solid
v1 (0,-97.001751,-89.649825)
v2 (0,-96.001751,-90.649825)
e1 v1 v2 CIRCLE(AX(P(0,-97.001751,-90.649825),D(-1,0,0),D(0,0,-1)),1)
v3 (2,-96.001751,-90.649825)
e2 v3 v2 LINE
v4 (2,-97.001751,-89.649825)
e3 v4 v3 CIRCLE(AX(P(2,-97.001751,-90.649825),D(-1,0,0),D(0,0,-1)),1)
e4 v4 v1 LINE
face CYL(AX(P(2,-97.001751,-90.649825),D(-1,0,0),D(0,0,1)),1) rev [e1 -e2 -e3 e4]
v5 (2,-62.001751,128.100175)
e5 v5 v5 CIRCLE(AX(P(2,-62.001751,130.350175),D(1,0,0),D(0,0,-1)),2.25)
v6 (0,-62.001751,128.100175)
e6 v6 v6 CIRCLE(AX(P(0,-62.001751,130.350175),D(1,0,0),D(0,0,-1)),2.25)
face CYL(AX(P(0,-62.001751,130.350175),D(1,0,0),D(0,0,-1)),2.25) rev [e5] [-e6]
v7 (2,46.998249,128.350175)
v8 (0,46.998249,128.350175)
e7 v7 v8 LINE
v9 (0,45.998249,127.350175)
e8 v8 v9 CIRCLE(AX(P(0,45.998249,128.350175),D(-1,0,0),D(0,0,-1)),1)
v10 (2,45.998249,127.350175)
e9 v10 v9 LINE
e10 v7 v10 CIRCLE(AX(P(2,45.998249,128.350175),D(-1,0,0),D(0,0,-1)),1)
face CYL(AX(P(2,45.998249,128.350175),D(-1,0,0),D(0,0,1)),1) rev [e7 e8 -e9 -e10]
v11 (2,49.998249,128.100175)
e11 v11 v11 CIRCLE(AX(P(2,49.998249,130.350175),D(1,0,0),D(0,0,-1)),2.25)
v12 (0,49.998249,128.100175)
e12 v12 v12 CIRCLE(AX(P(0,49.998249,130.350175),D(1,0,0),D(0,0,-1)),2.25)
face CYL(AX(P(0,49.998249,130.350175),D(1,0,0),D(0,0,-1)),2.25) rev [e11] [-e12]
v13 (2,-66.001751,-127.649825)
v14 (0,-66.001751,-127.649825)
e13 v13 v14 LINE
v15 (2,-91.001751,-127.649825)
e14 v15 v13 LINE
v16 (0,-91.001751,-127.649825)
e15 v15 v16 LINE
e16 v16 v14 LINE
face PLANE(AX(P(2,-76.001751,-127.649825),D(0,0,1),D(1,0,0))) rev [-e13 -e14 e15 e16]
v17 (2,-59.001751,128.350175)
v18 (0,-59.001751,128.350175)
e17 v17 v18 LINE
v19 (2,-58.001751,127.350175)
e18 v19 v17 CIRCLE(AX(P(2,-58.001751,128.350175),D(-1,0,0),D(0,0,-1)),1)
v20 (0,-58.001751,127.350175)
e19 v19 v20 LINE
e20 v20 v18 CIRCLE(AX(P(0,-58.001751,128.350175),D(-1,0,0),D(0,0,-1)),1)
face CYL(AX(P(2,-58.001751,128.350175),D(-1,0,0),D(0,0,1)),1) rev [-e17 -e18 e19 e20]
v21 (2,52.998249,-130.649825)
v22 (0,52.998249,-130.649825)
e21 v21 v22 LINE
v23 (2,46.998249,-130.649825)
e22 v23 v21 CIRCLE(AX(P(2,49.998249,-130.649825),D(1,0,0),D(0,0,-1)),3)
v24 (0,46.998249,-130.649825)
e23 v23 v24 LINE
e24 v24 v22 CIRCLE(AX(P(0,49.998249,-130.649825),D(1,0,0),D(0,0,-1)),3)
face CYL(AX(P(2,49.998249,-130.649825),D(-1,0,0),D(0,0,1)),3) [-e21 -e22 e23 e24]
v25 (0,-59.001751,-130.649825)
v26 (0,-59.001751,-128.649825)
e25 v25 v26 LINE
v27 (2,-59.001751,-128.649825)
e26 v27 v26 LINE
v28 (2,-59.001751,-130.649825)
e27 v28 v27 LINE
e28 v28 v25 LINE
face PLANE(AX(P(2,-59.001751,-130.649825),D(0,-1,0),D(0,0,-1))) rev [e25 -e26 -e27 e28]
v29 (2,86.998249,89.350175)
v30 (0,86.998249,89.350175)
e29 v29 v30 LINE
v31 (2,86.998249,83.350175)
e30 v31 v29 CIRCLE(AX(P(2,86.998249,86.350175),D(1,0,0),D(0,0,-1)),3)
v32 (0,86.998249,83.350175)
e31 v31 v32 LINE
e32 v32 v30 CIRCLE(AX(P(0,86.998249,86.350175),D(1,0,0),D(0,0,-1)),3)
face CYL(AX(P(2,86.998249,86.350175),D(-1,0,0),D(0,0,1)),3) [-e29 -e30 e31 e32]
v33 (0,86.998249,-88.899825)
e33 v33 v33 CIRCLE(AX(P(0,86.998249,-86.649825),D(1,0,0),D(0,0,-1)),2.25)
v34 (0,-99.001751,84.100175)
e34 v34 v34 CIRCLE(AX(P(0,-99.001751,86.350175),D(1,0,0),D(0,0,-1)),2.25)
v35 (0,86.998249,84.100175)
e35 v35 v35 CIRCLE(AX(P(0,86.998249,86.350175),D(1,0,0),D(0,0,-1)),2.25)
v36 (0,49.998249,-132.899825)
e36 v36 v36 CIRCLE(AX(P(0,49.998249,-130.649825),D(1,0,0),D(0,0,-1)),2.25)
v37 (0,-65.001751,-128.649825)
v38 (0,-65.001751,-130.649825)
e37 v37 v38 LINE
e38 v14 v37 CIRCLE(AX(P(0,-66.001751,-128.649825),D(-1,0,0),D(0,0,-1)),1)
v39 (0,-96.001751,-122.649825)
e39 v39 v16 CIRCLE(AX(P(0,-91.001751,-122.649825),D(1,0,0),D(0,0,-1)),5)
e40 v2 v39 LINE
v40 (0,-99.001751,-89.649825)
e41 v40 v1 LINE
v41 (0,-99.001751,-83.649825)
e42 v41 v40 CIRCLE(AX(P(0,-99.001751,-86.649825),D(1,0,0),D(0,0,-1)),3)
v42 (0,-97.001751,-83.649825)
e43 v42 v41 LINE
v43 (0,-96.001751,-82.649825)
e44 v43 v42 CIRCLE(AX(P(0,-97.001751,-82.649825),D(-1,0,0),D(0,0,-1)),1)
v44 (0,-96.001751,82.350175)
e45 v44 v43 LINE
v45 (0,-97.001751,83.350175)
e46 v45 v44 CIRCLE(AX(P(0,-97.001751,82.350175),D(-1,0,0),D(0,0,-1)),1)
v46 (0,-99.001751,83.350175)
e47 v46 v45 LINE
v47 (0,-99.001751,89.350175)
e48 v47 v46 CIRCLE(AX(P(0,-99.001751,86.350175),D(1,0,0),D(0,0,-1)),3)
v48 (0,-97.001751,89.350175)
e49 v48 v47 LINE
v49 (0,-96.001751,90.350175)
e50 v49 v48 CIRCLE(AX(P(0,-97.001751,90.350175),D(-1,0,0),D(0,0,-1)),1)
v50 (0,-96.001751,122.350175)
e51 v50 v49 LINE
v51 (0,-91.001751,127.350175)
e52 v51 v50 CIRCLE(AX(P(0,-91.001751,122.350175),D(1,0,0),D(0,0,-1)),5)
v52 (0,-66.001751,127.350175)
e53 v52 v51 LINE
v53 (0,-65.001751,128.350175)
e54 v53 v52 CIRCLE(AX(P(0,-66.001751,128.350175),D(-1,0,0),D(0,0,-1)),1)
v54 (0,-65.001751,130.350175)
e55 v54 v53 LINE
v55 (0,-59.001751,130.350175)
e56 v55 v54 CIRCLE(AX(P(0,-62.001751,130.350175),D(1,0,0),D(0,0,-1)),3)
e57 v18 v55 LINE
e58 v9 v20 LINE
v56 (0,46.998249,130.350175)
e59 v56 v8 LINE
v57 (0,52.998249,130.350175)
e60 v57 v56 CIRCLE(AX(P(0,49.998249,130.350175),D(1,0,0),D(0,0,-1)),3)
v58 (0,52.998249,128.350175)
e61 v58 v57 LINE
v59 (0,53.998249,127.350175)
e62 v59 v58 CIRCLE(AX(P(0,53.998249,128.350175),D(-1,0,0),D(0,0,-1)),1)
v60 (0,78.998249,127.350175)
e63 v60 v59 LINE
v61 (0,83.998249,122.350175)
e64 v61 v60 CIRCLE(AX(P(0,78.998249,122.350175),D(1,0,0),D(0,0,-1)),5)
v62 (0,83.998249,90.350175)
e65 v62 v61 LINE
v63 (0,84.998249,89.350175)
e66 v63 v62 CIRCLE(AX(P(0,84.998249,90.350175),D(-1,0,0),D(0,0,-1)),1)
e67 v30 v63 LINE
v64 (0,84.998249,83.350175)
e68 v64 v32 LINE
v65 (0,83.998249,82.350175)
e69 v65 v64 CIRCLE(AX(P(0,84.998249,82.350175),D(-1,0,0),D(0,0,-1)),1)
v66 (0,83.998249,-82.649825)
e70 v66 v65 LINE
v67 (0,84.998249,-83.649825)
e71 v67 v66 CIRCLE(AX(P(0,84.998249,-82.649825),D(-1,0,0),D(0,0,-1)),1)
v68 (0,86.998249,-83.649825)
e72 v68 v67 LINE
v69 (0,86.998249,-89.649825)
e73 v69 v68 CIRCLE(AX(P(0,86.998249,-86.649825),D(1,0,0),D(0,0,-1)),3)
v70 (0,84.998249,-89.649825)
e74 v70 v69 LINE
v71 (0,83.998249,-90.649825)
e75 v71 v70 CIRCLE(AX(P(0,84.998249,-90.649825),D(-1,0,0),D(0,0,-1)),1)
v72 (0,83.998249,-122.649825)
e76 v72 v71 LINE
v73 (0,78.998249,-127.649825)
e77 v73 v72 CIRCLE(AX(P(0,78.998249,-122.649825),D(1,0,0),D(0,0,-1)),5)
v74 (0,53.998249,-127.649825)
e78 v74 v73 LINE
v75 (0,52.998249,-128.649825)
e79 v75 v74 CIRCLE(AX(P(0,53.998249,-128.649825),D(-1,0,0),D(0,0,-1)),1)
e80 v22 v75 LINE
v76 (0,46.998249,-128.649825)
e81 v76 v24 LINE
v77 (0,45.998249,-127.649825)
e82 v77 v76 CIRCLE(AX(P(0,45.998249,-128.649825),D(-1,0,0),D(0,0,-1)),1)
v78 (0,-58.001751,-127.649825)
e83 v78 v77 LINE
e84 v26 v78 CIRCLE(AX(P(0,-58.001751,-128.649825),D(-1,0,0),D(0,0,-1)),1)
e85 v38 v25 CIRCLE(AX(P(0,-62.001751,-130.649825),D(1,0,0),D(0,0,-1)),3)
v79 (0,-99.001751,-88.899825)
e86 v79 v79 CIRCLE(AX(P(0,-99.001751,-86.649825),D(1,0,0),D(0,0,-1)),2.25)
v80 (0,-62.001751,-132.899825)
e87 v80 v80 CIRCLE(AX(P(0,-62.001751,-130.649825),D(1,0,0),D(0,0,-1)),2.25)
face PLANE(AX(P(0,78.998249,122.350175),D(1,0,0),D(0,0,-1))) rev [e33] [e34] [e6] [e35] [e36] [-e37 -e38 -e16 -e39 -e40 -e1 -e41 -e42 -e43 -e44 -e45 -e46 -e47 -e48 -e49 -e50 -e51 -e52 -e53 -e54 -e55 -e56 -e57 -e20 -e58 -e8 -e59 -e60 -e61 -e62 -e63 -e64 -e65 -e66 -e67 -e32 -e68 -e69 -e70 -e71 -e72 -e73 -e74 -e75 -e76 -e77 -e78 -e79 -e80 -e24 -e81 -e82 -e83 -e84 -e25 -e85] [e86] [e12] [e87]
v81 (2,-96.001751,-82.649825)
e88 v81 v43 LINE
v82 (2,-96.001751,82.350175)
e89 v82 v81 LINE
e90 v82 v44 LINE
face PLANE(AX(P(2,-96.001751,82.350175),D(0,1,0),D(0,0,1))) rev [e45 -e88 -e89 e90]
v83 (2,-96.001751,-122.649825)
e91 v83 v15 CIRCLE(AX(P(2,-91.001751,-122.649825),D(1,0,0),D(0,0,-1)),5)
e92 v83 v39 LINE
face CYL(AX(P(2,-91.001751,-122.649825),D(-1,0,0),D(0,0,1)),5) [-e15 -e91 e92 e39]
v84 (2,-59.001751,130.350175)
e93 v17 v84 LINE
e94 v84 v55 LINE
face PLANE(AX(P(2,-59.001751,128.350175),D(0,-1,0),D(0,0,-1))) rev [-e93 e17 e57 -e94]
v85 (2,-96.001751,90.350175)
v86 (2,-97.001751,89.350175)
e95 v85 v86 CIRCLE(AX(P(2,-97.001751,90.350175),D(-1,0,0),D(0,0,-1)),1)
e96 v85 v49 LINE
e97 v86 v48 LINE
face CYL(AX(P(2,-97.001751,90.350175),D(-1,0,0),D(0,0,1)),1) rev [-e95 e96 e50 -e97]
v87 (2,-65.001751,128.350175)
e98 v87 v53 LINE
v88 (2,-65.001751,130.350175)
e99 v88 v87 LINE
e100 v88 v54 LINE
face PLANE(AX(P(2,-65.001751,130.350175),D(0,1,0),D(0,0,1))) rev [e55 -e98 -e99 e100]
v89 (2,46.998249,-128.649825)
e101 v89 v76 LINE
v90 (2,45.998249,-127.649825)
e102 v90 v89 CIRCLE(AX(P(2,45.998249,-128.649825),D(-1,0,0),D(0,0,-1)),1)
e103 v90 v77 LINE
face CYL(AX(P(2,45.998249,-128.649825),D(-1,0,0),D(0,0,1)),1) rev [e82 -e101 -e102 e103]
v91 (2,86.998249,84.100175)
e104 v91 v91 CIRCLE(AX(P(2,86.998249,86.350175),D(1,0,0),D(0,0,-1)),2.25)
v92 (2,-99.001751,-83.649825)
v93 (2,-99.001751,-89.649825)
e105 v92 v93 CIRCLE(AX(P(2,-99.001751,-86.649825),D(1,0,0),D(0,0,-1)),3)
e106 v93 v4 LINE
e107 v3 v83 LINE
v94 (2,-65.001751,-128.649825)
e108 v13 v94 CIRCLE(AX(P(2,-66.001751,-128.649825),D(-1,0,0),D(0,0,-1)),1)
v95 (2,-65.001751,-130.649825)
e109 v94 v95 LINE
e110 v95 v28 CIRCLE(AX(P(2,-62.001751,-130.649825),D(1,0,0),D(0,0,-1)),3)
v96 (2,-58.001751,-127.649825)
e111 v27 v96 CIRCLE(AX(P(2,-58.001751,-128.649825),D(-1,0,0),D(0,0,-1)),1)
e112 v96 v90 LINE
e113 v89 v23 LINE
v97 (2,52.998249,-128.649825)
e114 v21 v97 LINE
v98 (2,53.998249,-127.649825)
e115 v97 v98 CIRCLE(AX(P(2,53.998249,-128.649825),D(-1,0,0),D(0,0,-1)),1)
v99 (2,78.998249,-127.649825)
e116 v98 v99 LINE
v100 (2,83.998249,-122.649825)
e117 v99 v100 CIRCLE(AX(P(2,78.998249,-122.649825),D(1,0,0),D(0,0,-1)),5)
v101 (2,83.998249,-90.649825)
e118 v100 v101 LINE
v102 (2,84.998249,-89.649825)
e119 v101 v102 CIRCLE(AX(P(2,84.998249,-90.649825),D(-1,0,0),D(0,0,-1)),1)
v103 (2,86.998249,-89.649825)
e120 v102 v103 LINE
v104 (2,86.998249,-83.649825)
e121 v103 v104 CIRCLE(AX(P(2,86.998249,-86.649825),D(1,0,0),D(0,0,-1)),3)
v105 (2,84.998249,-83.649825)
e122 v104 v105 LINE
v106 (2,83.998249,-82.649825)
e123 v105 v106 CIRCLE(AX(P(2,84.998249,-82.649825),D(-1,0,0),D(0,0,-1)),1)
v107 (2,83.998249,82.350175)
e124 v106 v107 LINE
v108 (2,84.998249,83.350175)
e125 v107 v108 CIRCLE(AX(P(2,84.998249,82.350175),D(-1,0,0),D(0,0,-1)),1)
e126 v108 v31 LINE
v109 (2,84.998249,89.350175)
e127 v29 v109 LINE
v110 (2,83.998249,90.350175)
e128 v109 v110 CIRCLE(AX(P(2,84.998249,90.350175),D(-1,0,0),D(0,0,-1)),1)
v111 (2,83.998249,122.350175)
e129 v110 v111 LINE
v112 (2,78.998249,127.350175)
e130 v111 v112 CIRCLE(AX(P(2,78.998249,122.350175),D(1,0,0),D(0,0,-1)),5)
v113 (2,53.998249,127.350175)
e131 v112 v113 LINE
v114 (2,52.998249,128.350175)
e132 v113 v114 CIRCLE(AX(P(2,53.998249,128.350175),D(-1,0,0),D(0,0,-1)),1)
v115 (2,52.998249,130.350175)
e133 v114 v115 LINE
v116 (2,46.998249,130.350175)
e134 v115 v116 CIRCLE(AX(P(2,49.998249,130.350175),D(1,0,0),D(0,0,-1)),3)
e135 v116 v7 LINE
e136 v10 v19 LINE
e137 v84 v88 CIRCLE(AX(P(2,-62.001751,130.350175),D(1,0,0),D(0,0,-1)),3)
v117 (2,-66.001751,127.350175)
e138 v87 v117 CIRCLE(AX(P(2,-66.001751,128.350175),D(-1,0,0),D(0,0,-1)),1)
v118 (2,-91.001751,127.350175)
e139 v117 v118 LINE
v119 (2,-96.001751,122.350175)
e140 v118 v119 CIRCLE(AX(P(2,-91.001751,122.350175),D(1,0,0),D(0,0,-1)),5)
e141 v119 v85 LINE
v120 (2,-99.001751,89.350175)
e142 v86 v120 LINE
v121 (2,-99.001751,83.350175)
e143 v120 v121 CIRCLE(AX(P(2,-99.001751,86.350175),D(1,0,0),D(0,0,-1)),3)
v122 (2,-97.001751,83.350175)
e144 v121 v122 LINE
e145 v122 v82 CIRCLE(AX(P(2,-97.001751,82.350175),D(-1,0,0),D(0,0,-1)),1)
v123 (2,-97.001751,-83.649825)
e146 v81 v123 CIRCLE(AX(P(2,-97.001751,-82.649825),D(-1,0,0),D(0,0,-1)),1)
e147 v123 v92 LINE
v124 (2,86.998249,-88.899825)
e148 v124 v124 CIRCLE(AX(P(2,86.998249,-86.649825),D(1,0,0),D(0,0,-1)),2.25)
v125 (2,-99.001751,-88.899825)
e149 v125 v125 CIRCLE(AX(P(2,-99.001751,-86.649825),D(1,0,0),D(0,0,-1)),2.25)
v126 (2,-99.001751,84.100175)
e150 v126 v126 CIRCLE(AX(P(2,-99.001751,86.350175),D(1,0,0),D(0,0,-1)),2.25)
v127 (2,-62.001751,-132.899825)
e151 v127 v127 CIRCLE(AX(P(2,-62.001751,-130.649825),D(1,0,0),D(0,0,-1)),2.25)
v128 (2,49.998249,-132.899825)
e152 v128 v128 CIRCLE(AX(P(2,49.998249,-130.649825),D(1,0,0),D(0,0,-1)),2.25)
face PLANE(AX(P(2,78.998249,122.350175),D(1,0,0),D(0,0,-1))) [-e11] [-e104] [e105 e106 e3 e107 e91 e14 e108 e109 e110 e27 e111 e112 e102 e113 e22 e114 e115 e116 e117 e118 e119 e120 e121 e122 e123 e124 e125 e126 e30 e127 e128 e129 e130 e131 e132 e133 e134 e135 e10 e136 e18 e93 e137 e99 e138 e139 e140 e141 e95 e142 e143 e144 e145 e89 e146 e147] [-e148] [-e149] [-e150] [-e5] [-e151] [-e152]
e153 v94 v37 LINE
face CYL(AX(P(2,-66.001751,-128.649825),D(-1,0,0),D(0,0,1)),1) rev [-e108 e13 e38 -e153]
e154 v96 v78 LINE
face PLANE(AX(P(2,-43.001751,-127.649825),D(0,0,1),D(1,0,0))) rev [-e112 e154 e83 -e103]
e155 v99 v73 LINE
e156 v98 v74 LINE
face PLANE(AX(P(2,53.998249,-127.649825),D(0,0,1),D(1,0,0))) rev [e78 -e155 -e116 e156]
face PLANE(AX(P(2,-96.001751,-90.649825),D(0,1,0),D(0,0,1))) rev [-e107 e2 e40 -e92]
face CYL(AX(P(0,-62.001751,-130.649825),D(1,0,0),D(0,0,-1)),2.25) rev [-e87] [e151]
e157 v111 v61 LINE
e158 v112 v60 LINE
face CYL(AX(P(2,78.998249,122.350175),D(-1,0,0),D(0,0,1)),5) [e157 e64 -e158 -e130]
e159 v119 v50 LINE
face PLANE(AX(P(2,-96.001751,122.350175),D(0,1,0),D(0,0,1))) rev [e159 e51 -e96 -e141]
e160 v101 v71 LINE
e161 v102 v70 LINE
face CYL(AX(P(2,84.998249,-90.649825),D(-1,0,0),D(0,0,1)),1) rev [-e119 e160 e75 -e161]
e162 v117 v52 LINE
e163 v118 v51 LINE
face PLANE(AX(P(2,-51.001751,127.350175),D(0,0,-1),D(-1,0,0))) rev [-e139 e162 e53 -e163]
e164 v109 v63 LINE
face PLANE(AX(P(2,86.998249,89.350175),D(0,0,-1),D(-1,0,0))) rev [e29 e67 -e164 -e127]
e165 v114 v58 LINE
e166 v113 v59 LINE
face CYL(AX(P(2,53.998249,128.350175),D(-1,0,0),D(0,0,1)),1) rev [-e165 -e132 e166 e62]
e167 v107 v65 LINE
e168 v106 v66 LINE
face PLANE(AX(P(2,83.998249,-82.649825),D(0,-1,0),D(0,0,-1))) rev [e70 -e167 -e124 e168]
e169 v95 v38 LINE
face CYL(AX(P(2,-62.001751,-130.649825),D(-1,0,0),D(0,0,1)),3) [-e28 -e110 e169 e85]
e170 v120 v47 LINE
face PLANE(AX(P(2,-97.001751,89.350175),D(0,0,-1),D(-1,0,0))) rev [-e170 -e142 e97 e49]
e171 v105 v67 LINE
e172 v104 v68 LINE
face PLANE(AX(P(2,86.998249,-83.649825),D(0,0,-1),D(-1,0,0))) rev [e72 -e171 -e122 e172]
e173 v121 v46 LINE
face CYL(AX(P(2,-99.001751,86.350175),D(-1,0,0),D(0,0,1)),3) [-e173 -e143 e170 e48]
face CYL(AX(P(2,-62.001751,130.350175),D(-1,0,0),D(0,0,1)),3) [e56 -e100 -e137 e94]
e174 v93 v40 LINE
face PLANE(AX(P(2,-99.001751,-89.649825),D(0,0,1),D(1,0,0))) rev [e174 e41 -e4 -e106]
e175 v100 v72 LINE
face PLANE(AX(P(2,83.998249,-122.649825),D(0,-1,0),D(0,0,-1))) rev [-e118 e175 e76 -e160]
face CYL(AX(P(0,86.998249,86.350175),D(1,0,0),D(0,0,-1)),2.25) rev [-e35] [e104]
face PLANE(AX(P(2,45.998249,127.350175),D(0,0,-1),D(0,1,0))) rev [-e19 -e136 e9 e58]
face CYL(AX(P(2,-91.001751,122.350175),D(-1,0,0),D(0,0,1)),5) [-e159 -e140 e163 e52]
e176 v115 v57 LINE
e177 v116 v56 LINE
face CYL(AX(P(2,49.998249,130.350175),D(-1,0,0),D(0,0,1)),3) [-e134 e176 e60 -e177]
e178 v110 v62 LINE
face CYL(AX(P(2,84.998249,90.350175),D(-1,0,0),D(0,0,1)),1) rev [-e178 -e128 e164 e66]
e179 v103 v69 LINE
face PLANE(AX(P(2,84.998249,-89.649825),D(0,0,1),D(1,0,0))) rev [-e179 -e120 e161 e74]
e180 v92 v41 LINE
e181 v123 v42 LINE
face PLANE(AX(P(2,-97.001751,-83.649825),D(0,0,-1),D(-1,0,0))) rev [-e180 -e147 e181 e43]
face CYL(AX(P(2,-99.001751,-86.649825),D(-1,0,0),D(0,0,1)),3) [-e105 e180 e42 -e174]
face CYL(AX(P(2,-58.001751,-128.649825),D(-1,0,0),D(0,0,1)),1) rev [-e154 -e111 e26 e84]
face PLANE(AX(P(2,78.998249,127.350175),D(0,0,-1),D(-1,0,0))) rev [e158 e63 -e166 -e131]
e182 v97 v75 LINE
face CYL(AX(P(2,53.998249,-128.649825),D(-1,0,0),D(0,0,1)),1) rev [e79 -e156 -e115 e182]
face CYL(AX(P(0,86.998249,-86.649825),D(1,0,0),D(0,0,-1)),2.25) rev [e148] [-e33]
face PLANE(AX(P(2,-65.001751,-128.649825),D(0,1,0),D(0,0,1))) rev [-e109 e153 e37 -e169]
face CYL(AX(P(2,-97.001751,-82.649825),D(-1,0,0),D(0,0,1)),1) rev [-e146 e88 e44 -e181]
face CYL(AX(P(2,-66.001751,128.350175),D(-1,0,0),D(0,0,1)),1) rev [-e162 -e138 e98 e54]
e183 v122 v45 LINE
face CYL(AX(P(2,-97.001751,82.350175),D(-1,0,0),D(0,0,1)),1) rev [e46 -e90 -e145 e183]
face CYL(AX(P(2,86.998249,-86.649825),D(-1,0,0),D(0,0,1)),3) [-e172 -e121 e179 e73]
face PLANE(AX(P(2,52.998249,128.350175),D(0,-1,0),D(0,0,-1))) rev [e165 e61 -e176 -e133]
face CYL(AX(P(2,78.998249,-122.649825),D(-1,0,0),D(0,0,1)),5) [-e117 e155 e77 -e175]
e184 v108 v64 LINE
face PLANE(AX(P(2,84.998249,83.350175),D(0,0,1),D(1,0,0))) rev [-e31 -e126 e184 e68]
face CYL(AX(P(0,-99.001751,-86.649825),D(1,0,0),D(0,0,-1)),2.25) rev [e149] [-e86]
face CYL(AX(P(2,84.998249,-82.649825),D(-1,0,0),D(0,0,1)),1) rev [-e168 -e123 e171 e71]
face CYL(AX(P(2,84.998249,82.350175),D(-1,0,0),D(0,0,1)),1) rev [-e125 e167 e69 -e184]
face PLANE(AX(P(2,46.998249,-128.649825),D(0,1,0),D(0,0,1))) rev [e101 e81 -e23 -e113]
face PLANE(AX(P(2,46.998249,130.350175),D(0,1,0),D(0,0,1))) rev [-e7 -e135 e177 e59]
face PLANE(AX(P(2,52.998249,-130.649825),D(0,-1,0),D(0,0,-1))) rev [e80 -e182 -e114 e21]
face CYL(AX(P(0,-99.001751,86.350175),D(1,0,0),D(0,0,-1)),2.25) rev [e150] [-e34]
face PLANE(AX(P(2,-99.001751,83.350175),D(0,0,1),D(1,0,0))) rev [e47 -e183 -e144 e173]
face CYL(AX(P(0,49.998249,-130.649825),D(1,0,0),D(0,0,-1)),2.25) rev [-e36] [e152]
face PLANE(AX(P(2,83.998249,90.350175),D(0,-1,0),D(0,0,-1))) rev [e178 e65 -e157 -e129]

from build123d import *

# Parameters (mm, degrees)
IZIM1_R                     = 1.6
Y_KSEKLIK_EKSTR_ZYON1_DEPTH = 2
IZIM2_R                     = 2.25
KES_EKSTR_ZYON1_DEPTH       = 2
Y_Z_TA_1_OUTLINE_R          = 2.25
Y_Z_TA_1_DEPTH              = 2
Y_Z_TA_1_2_OUTLINE_R        = 2.25
Y_Z_TA_1_2_DEPTH            = 2


# Read off the part's stored shape, not the designer's step: Yüzü Taşı1
with BuildPart() as part:
    # Çizim1 → Yükseklik-Ekstrüzyon1 (new body)
    with BuildSketch(Plane.YZ):
        with BuildLine():
            Line((78.998248848, 127.350175115), (53.998248848, 127.350175115))
            ThreePointArc((53.998248848, 127.350175115), (53.291142067, 127.643068334), (52.998248848, 128.350175115))
            Line((52.998248848, 128.350175115), (52.998248848, 130.350175115))
            ThreePointArc((52.998248848, 130.350175115), (49.998248848, 133.350175115), (46.998248848, 130.350175115))
            Line((46.998248848, 130.350175115), (46.998248848, 128.350175115))
            ThreePointArc((46.998248848, 128.350175115), (46.705355629, 127.643068334), (45.998248848, 127.350175115))
            Line((45.998248848, 127.350175115), (-43.001751152, 127.350175115))
            ThreePointArc((-43.001751152, 127.350175115), (-43.708857933, 127.643068334), (-44.001751152, 128.350175115))
            Line((-44.001751152, 128.350175115), (-44.001751152, 130.350175115))
            ThreePointArc((-44.001751152, 130.350175115), (-47.001751152, 133.350175115), (-50.001751152, 130.350175115))
            Line((-50.001751152, 130.350175115), (-50.001751152, 128.350175115))
            ThreePointArc((-50.001751152, 128.350175115), (-50.294644371, 127.643068334), (-51.001751152, 127.350175115))
            Line((-51.001751152, 127.350175115), (-76.001751152, 127.350175115))
            ThreePointArc((-76.001751152, 127.350175115), (-79.537285058, 125.885709021), (-81.001751152, 122.350175115))
            Line((-81.001751152, 122.350175115), (-81.001751152, 90.350175115))
            ThreePointArc((-81.001751152, 90.350175115), (-81.294644371, 89.643068334), (-82.001751152, 89.350175115))
            Line((-82.001751152, 89.350175115), (-84.001751152, 89.350175115))
            ThreePointArc((-84.001751152, 89.350175115), (-87.001751152, 86.350175115), (-84.001751152, 83.350175115))
            Line((-84.001751152, 83.350175115), (-82.001751152, 83.350175115))
            ThreePointArc((-82.001751152, 83.350175115), (-81.294644371, 83.057281896), (-81.001751152, 82.350175115))
            Line((-81.001751152, 82.350175115), (-81.001751152, -82.649824885))
            ThreePointArc((-81.001751152, -82.649824885), (-81.294644371, -83.356931666), (-82.001751152, -83.649824885))
            Line((-82.001751152, -83.649824885), (-84.001751152, -83.649824885))
            ThreePointArc((-84.001751152, -83.649824885), (-87.001751152, -86.649824885), (-84.001751152, -89.649824885))
            Line((-84.001751152, -89.649824885), (-82.001751152, -89.649824885))
            ThreePointArc((-82.001751152, -89.649824885), (-81.294644371, -89.942718104), (-81.001751152, -90.649824885))
            Line((-81.001751152, -90.649824885), (-81.001751152, -122.649824885))
            ThreePointArc((-81.001751152, -122.649824885), (-79.537285058, -126.185358791), (-76.001751152, -127.649824885))
            Line((-76.001751152, -127.649824885), (-51.001751152, -127.649824885))
            ThreePointArc((-51.001751152, -127.649824885), (-50.294644371, -127.942718104), (-50.001751152, -128.649824885))
            Line((-50.001751152, -128.649824885), (-50.001751152, -130.649824885))
            ThreePointArc((-50.001751152, -130.649824885), (-47.001751152, -133.649824885), (-44.001751152, -130.649824885))
            Line((-44.001751152, -130.649824885), (-44.001751152, -128.649824885))
            ThreePointArc((-44.001751152, -128.649824885), (-43.708857933, -127.942718104), (-43.001751152, -127.649824885))
            Line((-43.001751152, -127.649824885), (45.998248848, -127.649824885))
            ThreePointArc((45.998248848, -127.649824885), (46.705355629, -127.942718104), (46.998248848, -128.649824885))
            Line((46.998248848, -128.649824885), (46.998248848, -130.649824885))
            ThreePointArc((46.998248848, -130.649824885), (49.998248848, -133.649824885), (52.998248848, -130.649824885))
            Line((52.998248848, -130.649824885), (52.998248848, -128.649824885))
            ThreePointArc((52.998248848, -128.649824885), (53.291142067, -127.942718104), (53.998248848, -127.649824885))
            Line((53.998248848, -127.649824885), (78.998248848, -127.649824885))
            ThreePointArc((78.998248848, -127.649824885), (82.533782754, -126.185358791), (83.998248848, -122.649824885))
            Line((83.998248848, -122.649824885), (83.998248848, -90.649824885))
            ThreePointArc((83.998248848, -90.649824885), (84.291142067, -89.942718104), (84.998248848, -89.649824885))
            Line((84.998248848, -89.649824885), (86.998248848, -89.649824885))
            ThreePointArc((86.998248848, -89.649824885), (89.998248848, -86.649824885), (86.998248848, -83.649824885))
            Line((86.998248848, -83.649824885), (84.998248848, -83.649824885))
            ThreePointArc((84.998248848, -83.649824885), (84.291142067, -83.356931666), (83.998248848, -82.649824885))
            Line((83.998248848, -82.649824885), (83.998248848, 82.350175115))
            ThreePointArc((83.998248848, 82.350175115), (84.291142067, 83.057281896), (84.998248848, 83.350175115))
            Line((84.998248848, 83.350175115), (86.998248848, 83.350175115))
            ThreePointArc((86.998248848, 83.350175115), (89.998248848, 86.350175115), (86.998248848, 89.350175115))
            Line((86.998248848, 89.350175115), (84.998248848, 89.350175115))
            ThreePointArc((84.998248848, 89.350175115), (84.291142067, 89.643068334), (83.998248848, 90.350175115))
            Line((83.998248848, 90.350175115), (83.998248848, 122.350175115))
            ThreePointArc((83.998248848, 122.350175115), (82.533782754, 125.885709021), (78.998248848, 127.350175115))
        make_face()
        with Locations(Location((-84.001751152, -86.649824885, 0), (0, 0, 270))):
            Circle(IZIM1_R, mode=Mode.SUBTRACT)
        with Locations(Location((-47.001751152, -130.649824885, 0), (0, 0, 270))):
            Circle(IZIM1_R, mode=Mode.SUBTRACT)
        with Locations(Location((49.998248848, -130.649824885, 0), (0, 0, 270))):
            Circle(IZIM1_R, mode=Mode.SUBTRACT)
        with Locations(Location((86.998248848, -86.649824885, 0), (0, 0, 270))):
            Circle(IZIM1_R, mode=Mode.SUBTRACT)
        with Locations(Location((86.998248848, 86.350175115, 0), (0, 0, 270))):
            Circle(IZIM1_R, mode=Mode.SUBTRACT)
        with Locations(Location((49.998248848, 130.350175115, 0), (0, 0, 270))):
            Circle(IZIM1_R, mode=Mode.SUBTRACT)
        with Locations(Location((-47.001751152, 130.350175115, 0), (0, 0, 270))):
            Circle(IZIM1_R, mode=Mode.SUBTRACT)
        with Locations(Location((-84.001751152, 86.350175115, 0), (0, 0, 270))):
            Circle(IZIM1_R, mode=Mode.SUBTRACT)
    extrude(amount=Y_KSEKLIK_EKSTR_ZYON1_DEPTH)

    # Çizim2 → Kes-Ekstrüzyon1 (cut)
    with BuildSketch(Plane.YZ.offset(2)):
        with Locations(Location((-84.001751152, 86.350175115, 0), (0, 0, 270))):
            Circle(IZIM2_R)
    kes_ekstr_zyon1 = extrude(amount=-KES_EKSTR_ZYON1_DEPTH, mode=Mode.SUBTRACT)

    # Çizim-Çoğaltma1: Kes-Ekstrüzyon1 at 7 more places
    with Locations((0, 37, 44), (0, 134, 44), (0, 171, 0), (0, 171, -173), (0, 134, -217), (0, 37, -217), (0, 0, -173)):
        add(kes_ekstr_zyon1, mode=Mode.SUBTRACT)

    # Yüzü Taşı1 outline → Yüzü Taşı1 (cut)
    # profile 1 of 2: a face of its own
    with BuildSketch(Plane.YZ):
        with BuildLine():
            ThreePointArc((-50.001751152, 128.350175115), (-50.294644371, 127.643068334), (-51.001751152, 127.350175115))
            Line((-51.001751152, 127.350175115), (-43.001751152, 127.350175115))
            ThreePointArc((-43.001751152, 127.350175115), (-43.708857933, 127.643068334), (-44.001751152, 128.350175115))
            Line((-44.001751152, 128.350175115), (-44.001751152, 130.350175115))
            ThreePointArc((-44.001751152, 130.350175115), (-47.001751152, 133.350175115), (-50.001751152, 130.350175115))
            Line((-50.001751152, 130.350175115), (-50.001751152, 128.350175115))
        make_face()
        with Locations((-47.001751152, 130.350175115)):
            Circle(Y_Z_TA_1_OUTLINE_R, mode=Mode.SUBTRACT)
    # profile 2 of 2: a face of its own
    with BuildSketch(Plane.YZ):
        with BuildLine():
            Line((-43.001751152, -127.649824885), (-51.001751152, -127.649824885))
            ThreePointArc((-51.001751152, -127.649824885), (-50.294644371, -127.942718104), (-50.001751152, -128.649824885))
            Line((-50.001751152, -128.649824885), (-50.001751152, -130.649824885))
            ThreePointArc((-50.001751152, -130.649824885), (-47.001751152, -133.649824885), (-44.001751152, -130.649824885))
            Line((-44.001751152, -130.649824885), (-44.001751152, -128.649824885))
            ThreePointArc((-44.001751152, -128.649824885), (-43.708857933, -127.942718104), (-43.001751152, -127.649824885))
        make_face()
        with Locations((-47.001751152, -130.649824885)):
            Circle(Y_Z_TA_1_OUTLINE_R, mode=Mode.SUBTRACT)
    extrude(amount=Y_Z_TA_1_DEPTH, mode=Mode.SUBTRACT)

    # Y_z_ Ta_1 2 outline → Y_z_ Ta_1 2 (add)
    # profile 1 of 5: a face of its own
    with BuildSketch(Plane.YZ):
        with BuildLine():
            Line((-66.001751152, 127.350175115), (-58.001751152, 127.350175115))
            ThreePointArc((-58.001751152, 127.350175115), (-58.708857933, 127.643068334), (-59.001751152, 128.350175115))
            Line((-59.001751152, 128.350175115), (-59.001751152, 130.350175115))
            ThreePointArc((-59.001751152, 130.350175115), (-62.001751152, 133.350175115), (-65.001751152, 130.350175115))
            Line((-65.001751152, 130.350175115), (-65.001751152, 128.350175115))
            ThreePointArc((-65.001751152, 128.350175115), (-65.294644371, 127.643068334), (-66.001751152, 127.350175115))
        make_face()
        with Locations((-62.001751152, 130.350175115)):
            Circle(Y_Z_TA_1_2_OUTLINE_R, mode=Mode.SUBTRACT)
    # profile 2 of 5: a face of its own
    with BuildSketch(Plane.YZ):
        with BuildLine():
            Line((-58.001751152, -127.649824885), (-66.001751152, -127.649824885))
            ThreePointArc((-66.001751152, -127.649824885), (-65.294644371, -127.942718104), (-65.001751152, -128.649824885))
            Line((-65.001751152, -128.649824885), (-65.001751152, -130.649824885))
            ThreePointArc((-65.001751152, -130.649824885), (-62.001751152, -133.649824885), (-59.001751152, -130.649824885))
            Line((-59.001751152, -130.649824885), (-59.001751152, -128.649824885))
            ThreePointArc((-59.001751152, -128.649824885), (-58.708857933, -127.942718104), (-58.001751152, -127.649824885))
        make_face()
        with Locations((-62.001751152, -130.649824885)):
            Circle(Y_Z_TA_1_2_OUTLINE_R, mode=Mode.SUBTRACT)
    # profile 3 of 5: a face of its own
    with BuildSketch(Plane.YZ):
        with BuildLine():
            ThreePointArc((-81.001751152, 122.350175115), (-79.537285058, 125.885709021), (-76.001751152, 127.350175115))
            Line((-76.001751152, 127.350175115), (-91.001751152, 127.350175115))
            ThreePointArc((-91.001751152, 127.350175115), (-94.537285058, 125.885709021), (-96.001751152, 122.350175115))
            Line((-96.001751152, 122.350175115), (-96.001751152, 90.350175115))
            ThreePointArc((-96.001751152, 90.350175115), (-96.294644371, 89.643068334), (-97.001751152, 89.350175115))
            Line((-97.001751152, 89.350175115), (-99.001751152, 89.350175115))
            ThreePointArc((-99.001751152, 89.350175115), (-102.001751152, 86.350175115), (-99.001751152, 83.350175115))
            Line((-99.001751152, 83.350175115), (-97.001751152, 83.350175115))
            ThreePointArc((-97.001751152, 83.350175115), (-96.294644371, 83.057281896), (-96.001751152, 82.350175115))
            Line((-96.001751152, 82.350175115), (-96.001751152, -82.649824885))
            ThreePointArc((-96.001751152, -82.649824885), (-96.294644371, -83.356931666), (-97.001751152, -83.649824885))
            Line((-97.001751152, -83.649824885), (-99.001751152, -83.649824885))
            ThreePointArc((-99.001751152, -83.649824885), (-102.001751152, -86.649824885), (-99.001751152, -89.649824885))
            Line((-99.001751152, -89.649824885), (-97.001751152, -89.649824885))
            ThreePointArc((-97.001751152, -89.649824885), (-96.294644371, -89.942718104), (-96.001751152, -90.649824885))
            Line((-96.001751152, -90.649824885), (-96.001751152, -122.649824885))
            ThreePointArc((-96.001751152, -122.649824885), (-94.537285058, -126.185358791), (-91.001751152, -127.649824885))
            Line((-91.001751152, -127.649824885), (-76.001751152, -127.649824885))
            ThreePointArc((-76.001751152, -127.649824885), (-79.537285058, -126.185358791), (-81.001751152, -122.649824885))
            Line((-81.001751152, -122.649824885), (-81.001751152, -90.649824885))
            ThreePointArc((-81.001751152, -90.649824885), (-81.294644371, -89.942718104), (-82.001751152, -89.649824885))
            Line((-82.001751152, -89.649824885), (-84.001751152, -89.649824885))
            ThreePointArc((-84.001751152, -89.649824885), (-87.001751152, -86.649824885), (-84.001751152, -83.649824885))
            Line((-84.001751152, -83.649824885), (-82.001751152, -83.649824885))
            ThreePointArc((-82.001751152, -83.649824885), (-81.294644371, -83.356931666), (-81.001751152, -82.649824885))
            Line((-81.001751152, -82.649824885), (-81.001751152, 82.350175115))
            ThreePointArc((-81.001751152, 82.350175115), (-81.294644371, 83.057281896), (-82.001751152, 83.350175115))
            Line((-82.001751152, 83.350175115), (-84.001751152, 83.350175115))
            ThreePointArc((-84.001751152, 83.350175115), (-87.001751152, 86.350175115), (-84.001751152, 89.350175115))
            Line((-84.001751152, 89.350175115), (-82.001751152, 89.350175115))
            ThreePointArc((-82.001751152, 89.350175115), (-81.294644371, 89.643068334), (-81.001751152, 90.350175115))
            Line((-81.001751152, 90.350175115), (-81.001751152, 122.350175115))
        make_face()
        with Locations((-99.001751152, -86.649824885)):
            Circle(Y_Z_TA_1_2_OUTLINE_R, mode=Mode.SUBTRACT)
        with Locations((-99.001751152, 86.350175115)):
            Circle(Y_Z_TA_1_2_OUTLINE_R, mode=Mode.SUBTRACT)
    # profile 4 of 5: a face of its own
    with BuildSketch(Plane.YZ):
        with Locations((-84.001751152, 86.350175115)):
            Circle(Y_Z_TA_1_2_OUTLINE_R)
    # profile 5 of 5: a face of its own
    with BuildSketch(Plane.YZ):
        with Locations((-84.001751152, -86.649824885)):
            Circle(Y_Z_TA_1_2_OUTLINE_R)
    extrude(amount=Y_Z_TA_1_2_DEPTH)


solid = part.part
